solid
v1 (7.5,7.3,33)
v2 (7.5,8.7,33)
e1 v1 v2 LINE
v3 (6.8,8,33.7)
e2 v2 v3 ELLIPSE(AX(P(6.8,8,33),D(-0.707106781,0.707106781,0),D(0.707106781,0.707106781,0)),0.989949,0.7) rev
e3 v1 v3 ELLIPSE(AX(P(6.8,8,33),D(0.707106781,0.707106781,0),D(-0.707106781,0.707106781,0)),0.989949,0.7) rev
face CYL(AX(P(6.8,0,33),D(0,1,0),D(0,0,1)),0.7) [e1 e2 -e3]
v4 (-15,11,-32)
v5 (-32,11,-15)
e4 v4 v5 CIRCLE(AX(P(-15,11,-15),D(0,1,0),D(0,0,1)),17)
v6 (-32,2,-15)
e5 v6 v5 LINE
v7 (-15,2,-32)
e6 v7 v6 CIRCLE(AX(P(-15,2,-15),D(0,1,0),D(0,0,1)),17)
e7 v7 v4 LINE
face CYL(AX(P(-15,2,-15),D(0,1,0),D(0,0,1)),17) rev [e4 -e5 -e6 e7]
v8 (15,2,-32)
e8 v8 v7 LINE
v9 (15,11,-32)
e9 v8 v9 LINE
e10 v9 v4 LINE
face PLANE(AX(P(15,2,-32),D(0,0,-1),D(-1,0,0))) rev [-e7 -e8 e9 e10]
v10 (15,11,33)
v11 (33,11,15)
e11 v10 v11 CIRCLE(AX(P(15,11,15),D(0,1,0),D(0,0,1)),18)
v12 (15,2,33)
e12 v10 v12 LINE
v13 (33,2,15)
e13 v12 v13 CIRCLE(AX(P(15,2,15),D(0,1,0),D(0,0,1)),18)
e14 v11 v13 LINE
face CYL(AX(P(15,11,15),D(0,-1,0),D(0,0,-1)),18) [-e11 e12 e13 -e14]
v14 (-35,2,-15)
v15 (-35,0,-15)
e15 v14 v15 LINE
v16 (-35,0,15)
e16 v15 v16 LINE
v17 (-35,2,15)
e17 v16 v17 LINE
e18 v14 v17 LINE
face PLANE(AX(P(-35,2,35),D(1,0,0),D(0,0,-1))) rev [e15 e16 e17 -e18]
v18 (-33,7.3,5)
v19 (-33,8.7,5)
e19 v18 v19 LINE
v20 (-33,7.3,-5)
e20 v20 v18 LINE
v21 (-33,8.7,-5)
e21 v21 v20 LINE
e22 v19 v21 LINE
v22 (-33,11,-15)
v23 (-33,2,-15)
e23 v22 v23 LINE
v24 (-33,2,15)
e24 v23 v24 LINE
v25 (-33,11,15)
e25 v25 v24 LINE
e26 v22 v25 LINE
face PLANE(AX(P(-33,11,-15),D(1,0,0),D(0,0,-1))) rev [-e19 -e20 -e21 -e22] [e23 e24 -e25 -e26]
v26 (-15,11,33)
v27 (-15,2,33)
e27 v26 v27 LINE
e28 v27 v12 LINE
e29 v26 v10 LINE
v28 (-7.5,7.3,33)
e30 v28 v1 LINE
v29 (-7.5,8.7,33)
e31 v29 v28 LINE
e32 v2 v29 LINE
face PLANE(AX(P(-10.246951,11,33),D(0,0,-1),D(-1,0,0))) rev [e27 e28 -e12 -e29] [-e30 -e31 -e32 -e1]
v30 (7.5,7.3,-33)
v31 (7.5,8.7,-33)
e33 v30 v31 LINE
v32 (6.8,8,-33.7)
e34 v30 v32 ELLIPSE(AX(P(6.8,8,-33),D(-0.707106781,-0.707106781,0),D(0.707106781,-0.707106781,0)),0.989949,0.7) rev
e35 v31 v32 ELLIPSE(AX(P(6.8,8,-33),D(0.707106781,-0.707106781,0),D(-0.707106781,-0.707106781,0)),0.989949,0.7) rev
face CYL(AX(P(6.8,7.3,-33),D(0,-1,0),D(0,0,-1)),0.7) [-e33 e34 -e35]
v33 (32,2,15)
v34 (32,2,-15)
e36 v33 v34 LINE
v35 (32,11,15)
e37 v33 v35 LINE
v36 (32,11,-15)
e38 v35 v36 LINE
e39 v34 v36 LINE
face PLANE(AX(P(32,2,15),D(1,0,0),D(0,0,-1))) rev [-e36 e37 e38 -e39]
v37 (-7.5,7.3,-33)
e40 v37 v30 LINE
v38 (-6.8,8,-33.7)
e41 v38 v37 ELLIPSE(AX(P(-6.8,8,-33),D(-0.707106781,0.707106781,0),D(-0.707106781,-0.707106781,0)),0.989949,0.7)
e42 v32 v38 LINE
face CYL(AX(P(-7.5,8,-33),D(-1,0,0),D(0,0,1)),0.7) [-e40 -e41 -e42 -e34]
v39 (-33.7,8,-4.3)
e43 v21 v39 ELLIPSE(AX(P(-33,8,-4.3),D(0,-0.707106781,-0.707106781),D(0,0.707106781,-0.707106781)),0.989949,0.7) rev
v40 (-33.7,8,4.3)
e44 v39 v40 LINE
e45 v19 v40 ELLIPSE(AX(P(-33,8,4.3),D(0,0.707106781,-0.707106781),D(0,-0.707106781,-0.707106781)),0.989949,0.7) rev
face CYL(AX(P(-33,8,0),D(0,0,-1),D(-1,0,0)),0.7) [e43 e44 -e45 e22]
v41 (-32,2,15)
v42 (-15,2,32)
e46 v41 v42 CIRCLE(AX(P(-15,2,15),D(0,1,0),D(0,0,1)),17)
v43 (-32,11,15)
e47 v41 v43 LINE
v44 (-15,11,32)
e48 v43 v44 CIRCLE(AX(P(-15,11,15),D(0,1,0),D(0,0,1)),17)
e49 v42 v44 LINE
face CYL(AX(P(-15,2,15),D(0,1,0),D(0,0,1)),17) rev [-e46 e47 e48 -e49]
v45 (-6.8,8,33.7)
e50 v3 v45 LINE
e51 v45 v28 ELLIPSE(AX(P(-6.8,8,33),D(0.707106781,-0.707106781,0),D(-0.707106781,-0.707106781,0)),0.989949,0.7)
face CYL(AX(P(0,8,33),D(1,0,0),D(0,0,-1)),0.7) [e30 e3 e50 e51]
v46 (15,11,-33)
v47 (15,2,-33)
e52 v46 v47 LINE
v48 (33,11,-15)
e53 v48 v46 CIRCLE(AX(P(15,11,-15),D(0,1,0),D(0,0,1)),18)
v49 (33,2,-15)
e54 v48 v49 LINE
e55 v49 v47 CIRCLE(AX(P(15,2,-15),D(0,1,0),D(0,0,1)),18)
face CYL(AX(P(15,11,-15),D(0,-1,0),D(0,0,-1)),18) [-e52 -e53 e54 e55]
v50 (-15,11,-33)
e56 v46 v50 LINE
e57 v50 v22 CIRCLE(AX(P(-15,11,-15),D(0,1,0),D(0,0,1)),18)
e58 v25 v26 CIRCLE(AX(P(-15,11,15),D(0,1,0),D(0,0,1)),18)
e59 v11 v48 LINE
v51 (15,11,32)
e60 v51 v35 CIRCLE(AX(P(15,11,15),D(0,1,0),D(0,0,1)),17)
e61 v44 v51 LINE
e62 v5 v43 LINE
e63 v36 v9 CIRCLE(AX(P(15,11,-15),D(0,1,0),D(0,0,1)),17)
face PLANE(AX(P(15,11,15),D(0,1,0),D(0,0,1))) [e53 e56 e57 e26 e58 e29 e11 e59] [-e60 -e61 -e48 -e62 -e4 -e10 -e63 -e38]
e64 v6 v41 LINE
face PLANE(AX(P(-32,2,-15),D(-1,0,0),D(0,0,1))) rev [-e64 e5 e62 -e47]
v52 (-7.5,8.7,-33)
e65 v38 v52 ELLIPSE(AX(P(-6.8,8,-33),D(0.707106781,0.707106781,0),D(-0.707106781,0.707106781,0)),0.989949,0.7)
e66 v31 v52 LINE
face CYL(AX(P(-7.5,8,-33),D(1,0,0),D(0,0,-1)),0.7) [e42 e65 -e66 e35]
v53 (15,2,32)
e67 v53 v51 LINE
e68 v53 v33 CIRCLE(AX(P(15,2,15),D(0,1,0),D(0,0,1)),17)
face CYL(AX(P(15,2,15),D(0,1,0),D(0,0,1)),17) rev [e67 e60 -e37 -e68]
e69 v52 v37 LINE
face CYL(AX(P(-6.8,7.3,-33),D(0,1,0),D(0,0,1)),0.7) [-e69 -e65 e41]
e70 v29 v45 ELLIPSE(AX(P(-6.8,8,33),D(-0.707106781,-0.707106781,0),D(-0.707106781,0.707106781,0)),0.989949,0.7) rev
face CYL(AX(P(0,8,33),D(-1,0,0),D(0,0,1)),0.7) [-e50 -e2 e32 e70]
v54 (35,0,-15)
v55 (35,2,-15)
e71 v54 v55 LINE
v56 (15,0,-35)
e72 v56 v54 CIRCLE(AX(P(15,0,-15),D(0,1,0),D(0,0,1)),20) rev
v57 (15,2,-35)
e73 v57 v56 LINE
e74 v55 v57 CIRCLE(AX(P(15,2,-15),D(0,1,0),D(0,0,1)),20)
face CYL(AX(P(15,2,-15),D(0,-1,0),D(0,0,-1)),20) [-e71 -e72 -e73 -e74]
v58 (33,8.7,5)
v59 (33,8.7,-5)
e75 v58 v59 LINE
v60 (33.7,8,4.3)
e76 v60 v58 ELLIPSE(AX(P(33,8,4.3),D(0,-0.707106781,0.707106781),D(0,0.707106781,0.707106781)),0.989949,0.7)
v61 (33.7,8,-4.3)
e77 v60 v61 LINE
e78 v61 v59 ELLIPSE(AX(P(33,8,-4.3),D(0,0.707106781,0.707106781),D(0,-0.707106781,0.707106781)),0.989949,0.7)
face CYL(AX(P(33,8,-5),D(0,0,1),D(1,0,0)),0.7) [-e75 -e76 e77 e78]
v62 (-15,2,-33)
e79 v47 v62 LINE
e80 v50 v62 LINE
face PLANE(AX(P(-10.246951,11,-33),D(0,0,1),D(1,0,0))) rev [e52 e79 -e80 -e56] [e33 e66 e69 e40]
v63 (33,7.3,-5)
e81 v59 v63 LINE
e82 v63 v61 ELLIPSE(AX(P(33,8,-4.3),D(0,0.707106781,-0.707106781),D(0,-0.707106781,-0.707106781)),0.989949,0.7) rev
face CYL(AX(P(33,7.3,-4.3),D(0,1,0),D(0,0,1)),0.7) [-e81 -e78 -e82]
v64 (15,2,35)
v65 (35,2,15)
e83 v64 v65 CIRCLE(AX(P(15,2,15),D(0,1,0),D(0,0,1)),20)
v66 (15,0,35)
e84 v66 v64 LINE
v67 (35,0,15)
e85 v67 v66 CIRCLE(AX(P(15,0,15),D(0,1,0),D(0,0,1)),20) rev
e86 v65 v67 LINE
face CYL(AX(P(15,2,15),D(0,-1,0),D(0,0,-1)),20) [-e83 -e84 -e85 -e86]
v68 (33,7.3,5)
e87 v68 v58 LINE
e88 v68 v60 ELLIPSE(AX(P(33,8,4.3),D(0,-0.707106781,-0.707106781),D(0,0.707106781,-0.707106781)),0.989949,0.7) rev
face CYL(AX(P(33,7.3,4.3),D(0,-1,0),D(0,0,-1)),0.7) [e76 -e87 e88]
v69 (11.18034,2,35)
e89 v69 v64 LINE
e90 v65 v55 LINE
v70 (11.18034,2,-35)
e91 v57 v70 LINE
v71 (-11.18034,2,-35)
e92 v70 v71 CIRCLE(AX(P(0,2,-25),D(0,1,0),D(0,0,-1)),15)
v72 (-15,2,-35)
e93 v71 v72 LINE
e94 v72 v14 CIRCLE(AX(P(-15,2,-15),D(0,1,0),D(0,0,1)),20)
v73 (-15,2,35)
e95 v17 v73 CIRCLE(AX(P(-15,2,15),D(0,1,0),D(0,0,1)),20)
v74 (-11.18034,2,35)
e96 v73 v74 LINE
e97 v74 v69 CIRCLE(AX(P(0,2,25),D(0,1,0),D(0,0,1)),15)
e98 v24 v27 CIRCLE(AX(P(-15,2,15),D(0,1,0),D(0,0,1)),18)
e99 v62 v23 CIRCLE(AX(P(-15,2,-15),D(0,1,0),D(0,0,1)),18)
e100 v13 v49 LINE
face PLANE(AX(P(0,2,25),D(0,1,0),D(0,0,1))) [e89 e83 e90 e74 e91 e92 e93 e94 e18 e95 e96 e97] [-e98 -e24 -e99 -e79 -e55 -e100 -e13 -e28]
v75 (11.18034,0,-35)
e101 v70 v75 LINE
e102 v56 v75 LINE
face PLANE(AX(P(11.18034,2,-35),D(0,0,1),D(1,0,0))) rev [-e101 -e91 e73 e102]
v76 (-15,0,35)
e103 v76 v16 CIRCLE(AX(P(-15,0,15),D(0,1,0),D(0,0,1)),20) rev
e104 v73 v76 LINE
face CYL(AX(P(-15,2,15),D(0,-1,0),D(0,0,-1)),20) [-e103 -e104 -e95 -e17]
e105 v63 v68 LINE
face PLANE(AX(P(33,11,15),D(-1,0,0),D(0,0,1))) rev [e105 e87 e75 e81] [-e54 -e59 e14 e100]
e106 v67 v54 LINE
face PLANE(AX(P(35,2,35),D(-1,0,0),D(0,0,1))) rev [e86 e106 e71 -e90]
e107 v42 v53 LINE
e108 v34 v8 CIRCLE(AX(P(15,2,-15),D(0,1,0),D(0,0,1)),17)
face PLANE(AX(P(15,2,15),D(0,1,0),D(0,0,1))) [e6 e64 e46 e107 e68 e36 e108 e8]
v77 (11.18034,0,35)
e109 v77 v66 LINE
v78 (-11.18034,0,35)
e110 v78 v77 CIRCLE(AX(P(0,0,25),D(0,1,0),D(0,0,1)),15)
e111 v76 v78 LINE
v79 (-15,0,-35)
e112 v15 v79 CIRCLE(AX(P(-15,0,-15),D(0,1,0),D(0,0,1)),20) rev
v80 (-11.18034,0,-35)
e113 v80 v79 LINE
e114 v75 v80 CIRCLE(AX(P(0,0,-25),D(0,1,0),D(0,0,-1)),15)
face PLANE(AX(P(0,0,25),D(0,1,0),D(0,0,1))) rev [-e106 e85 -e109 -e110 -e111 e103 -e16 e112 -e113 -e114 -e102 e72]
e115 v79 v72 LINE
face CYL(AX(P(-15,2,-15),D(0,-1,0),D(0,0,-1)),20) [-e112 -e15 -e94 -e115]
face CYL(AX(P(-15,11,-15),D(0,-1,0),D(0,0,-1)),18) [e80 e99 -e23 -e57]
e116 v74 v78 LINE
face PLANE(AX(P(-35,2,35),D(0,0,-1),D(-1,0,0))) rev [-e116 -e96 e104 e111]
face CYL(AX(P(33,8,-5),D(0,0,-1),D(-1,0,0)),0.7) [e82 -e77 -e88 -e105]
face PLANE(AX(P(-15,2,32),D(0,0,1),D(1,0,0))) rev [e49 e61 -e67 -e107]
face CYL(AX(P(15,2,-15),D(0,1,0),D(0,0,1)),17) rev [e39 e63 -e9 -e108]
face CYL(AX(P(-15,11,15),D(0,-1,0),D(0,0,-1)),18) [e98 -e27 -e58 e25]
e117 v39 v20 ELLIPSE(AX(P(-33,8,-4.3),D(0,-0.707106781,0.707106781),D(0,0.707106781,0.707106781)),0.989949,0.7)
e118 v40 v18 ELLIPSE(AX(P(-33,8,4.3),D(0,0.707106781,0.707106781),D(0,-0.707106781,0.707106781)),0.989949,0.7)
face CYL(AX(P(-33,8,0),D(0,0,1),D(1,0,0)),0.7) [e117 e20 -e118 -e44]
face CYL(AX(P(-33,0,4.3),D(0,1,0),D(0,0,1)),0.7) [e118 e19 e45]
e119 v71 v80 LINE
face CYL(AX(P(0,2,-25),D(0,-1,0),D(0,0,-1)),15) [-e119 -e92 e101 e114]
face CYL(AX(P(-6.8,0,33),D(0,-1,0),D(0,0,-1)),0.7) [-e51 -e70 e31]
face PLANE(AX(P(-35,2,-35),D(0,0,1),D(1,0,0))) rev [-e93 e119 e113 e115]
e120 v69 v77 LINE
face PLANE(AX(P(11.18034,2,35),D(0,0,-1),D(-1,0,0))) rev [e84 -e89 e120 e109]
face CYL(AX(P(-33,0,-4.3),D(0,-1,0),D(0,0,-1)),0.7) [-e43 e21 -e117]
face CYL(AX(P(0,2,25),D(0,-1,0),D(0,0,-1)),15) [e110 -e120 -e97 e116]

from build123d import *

# Parameters (mm, degrees)
EXTRUDE_1_DEPTH        = 2
FILLET_1_R             = 20
EXTRUDE_2_DEPTH        = 9
CUT_EXTRUDE_2_DEPTH    = 9
SKETCH_4_W             = 10
SKETCH_4_H             = 1.4
EXTRUDE_3_DEPTH        = 0.7
FILLET_2_R             = 0.7
FILLET_2_OF_MIRROR_1_R = 0.7
SKETCH_5_W             = 15
SKETCH_5_H             = 1.4
EXTRUDE_4_DEPTH        = 0.7
FILLET_3_R             = 0.7
FILLET_3_OF_MIRROR_2_R = 0.7


with BuildPart() as part:
    # 草图1 → 凸台-拉伸1 (new body)
    with BuildSketch(Plane(origin=(0, 0, 0), x_dir=(1, 0, 0), z_dir=(0, 1, 0))):
        with BuildLine():
            Line((-35, -35), (-11.180339887, -35))
            ThreePointArc((-11.180339887, -35), (0, -40), (11.180339887, -35))
            Line((11.180339887, -35), (35, -35))
            Line((35, -35), (35, 35))
            Line((35, 35), (11.180339887, 35))
            ThreePointArc((11.180339887, 35), (0, 40), (-11.180339887, 35))
            Line((-11.180339887, 35), (-35, 35))
            Line((-35, 35), (-35, -35))
        make_face()
    extrude(amount=EXTRUDE_1_DEPTH)

    # 圆角1
    fillet_1_edges = [part.edges().sort_by_distance(p)[0] for p in [
        (35, 1, -35),
        (35, 1, 35),
        (-35, 1, 35),
        (-35, 1, -35),
    ]]
    fillet(fillet_1_edges, radius=FILLET_1_R)

    # 草图2 → 凸台-拉伸2 (add)
    with BuildSketch(Plane(origin=(0, 2, 0), x_dir=(1, 0, 0), z_dir=(0, 1, 0))):
        with BuildLine():
            Line((-10.246950766, 33), (10.246950766, 33))
            Line((10.246950766, 33), (15, 33))
            ThreePointArc((15, 33), (27.727922061, 27.727922061), (33, 15))
            Line((33, 15), (33, -15))
            ThreePointArc((33, -15), (27.727922061, -27.727922061), (15, -33))
            Line((15, -33), (10.246950766, -33))
            Line((10.246950766, -33), (-10.246950766, -33))
            Line((-10.246950766, -33), (-15, -33))
            ThreePointArc((-15, -33), (-27.727922061, -27.727922061), (-33, -15))
            Line((-33, -15), (-33, 15))
            ThreePointArc((-33, 15), (-27.727922061, 27.727922061), (-15, 33))
            Line((-15, 33), (-10.246950766, 33))
        make_face()
    extrude(amount=EXTRUDE_2_DEPTH)

    # 草图3 → 切除-拉伸2 (cut)
    with BuildSketch(Plane(origin=(0, 11, 0), x_dir=(1, 0, 0), z_dir=(0, 1, 0))):
        with BuildLine():
            Line((-15, -32), (15, -32))
            ThreePointArc((15, -32), (27.02081528, -27.02081528), (32, -15))
            Line((32, -15), (32, 15))
            ThreePointArc((32, 15), (27.02081528, 27.02081528), (15, 32))
            Line((15, 32), (-15, 32))
            ThreePointArc((-15, 32), (-27.02081528, 27.02081528), (-32, 15))
            Line((-32, 15), (-32, -15))
            ThreePointArc((-32, -15), (-27.02081528, -27.02081528), (-15, -32))
        make_face()
    extrude(amount=-CUT_EXTRUDE_2_DEPTH, mode=Mode.SUBTRACT)

    # 草图4 → 凸台-拉伸3 (add)
    with BuildSketch(Plane.ZY.offset(33)):
        with Locations((0, 8)):
            Rectangle(SKETCH_4_W, SKETCH_4_H)
    extrude_3 = extrude(amount=EXTRUDE_3_DEPTH)

    # 圆角2
    fillet_2_edges = [part.edges().sort_by_distance(p)[0] for p in [
        (-33.7, 8, 5),
        (-33.7, 8, -5),
        (-33.7, 7.3, 0),
        (-33.7, 8.7, 0),
    ]]
    fillet(fillet_2_edges, radius=FILLET_2_R - 0.0001)  # a hair under: the kernel refuses the full size

    # 镜向1: 凸台-拉伸3 across plane
    add(extrude_3.mirror(Plane(origin=(0, 0, 0), x_dir=(0, 0, 1), z_dir=(1, 0, 0))))

    # 圆角2 of 镜向1
    fillet_2_of_mirror_1_edges = [part.edges().sort_by_distance(p)[0] for p in [
        (33.7, 8, 5),
        (33.7, 8, -5),
        (33.7, 7.3, 0),
        (33.7, 8.7, 0),
    ]]
    fillet(fillet_2_of_mirror_1_edges, radius=FILLET_2_OF_MIRROR_1_R - 0.0001)  # a hair under: the kernel refuses the full size

    # 草图5 → 凸台-拉伸4 (add)
    with BuildSketch(Plane.XY.offset(33)):
        with Locations((0, 8)):
            Rectangle(SKETCH_5_W, SKETCH_5_H)
    extrude_4 = extrude(amount=EXTRUDE_4_DEPTH)

    # 圆角3
    fillet_3_edges = [part.edges().sort_by_distance(p)[0] for p in [
        (0, 7.3, 33.7),
        (-7.5, 8, 33.7),
        (0, 8.7, 33.7),
        (7.5, 8, 33.7),
    ]]
    fillet(fillet_3_edges, radius=FILLET_3_R - 0.0001)  # a hair under: the kernel refuses the full size

    # 镜向2: 凸台-拉伸4 across plane
    add(extrude_4.mirror(Plane.XY))

    # 圆角3 of 镜向2
    fillet_3_of_mirror_2_edges = [part.edges().sort_by_distance(p)[0] for p in [
        (0, 7.3, -33.7),
        (-7.5, 8, -33.7),
        (0, 8.7, -33.7),
        (7.5, 8, -33.7),
    ]]
    fillet(fillet_3_of_mirror_2_edges, radius=FILLET_3_OF_MIRROR_2_R - 0.0001)  # a hair under: the kernel refuses the full size


solid = part.part
